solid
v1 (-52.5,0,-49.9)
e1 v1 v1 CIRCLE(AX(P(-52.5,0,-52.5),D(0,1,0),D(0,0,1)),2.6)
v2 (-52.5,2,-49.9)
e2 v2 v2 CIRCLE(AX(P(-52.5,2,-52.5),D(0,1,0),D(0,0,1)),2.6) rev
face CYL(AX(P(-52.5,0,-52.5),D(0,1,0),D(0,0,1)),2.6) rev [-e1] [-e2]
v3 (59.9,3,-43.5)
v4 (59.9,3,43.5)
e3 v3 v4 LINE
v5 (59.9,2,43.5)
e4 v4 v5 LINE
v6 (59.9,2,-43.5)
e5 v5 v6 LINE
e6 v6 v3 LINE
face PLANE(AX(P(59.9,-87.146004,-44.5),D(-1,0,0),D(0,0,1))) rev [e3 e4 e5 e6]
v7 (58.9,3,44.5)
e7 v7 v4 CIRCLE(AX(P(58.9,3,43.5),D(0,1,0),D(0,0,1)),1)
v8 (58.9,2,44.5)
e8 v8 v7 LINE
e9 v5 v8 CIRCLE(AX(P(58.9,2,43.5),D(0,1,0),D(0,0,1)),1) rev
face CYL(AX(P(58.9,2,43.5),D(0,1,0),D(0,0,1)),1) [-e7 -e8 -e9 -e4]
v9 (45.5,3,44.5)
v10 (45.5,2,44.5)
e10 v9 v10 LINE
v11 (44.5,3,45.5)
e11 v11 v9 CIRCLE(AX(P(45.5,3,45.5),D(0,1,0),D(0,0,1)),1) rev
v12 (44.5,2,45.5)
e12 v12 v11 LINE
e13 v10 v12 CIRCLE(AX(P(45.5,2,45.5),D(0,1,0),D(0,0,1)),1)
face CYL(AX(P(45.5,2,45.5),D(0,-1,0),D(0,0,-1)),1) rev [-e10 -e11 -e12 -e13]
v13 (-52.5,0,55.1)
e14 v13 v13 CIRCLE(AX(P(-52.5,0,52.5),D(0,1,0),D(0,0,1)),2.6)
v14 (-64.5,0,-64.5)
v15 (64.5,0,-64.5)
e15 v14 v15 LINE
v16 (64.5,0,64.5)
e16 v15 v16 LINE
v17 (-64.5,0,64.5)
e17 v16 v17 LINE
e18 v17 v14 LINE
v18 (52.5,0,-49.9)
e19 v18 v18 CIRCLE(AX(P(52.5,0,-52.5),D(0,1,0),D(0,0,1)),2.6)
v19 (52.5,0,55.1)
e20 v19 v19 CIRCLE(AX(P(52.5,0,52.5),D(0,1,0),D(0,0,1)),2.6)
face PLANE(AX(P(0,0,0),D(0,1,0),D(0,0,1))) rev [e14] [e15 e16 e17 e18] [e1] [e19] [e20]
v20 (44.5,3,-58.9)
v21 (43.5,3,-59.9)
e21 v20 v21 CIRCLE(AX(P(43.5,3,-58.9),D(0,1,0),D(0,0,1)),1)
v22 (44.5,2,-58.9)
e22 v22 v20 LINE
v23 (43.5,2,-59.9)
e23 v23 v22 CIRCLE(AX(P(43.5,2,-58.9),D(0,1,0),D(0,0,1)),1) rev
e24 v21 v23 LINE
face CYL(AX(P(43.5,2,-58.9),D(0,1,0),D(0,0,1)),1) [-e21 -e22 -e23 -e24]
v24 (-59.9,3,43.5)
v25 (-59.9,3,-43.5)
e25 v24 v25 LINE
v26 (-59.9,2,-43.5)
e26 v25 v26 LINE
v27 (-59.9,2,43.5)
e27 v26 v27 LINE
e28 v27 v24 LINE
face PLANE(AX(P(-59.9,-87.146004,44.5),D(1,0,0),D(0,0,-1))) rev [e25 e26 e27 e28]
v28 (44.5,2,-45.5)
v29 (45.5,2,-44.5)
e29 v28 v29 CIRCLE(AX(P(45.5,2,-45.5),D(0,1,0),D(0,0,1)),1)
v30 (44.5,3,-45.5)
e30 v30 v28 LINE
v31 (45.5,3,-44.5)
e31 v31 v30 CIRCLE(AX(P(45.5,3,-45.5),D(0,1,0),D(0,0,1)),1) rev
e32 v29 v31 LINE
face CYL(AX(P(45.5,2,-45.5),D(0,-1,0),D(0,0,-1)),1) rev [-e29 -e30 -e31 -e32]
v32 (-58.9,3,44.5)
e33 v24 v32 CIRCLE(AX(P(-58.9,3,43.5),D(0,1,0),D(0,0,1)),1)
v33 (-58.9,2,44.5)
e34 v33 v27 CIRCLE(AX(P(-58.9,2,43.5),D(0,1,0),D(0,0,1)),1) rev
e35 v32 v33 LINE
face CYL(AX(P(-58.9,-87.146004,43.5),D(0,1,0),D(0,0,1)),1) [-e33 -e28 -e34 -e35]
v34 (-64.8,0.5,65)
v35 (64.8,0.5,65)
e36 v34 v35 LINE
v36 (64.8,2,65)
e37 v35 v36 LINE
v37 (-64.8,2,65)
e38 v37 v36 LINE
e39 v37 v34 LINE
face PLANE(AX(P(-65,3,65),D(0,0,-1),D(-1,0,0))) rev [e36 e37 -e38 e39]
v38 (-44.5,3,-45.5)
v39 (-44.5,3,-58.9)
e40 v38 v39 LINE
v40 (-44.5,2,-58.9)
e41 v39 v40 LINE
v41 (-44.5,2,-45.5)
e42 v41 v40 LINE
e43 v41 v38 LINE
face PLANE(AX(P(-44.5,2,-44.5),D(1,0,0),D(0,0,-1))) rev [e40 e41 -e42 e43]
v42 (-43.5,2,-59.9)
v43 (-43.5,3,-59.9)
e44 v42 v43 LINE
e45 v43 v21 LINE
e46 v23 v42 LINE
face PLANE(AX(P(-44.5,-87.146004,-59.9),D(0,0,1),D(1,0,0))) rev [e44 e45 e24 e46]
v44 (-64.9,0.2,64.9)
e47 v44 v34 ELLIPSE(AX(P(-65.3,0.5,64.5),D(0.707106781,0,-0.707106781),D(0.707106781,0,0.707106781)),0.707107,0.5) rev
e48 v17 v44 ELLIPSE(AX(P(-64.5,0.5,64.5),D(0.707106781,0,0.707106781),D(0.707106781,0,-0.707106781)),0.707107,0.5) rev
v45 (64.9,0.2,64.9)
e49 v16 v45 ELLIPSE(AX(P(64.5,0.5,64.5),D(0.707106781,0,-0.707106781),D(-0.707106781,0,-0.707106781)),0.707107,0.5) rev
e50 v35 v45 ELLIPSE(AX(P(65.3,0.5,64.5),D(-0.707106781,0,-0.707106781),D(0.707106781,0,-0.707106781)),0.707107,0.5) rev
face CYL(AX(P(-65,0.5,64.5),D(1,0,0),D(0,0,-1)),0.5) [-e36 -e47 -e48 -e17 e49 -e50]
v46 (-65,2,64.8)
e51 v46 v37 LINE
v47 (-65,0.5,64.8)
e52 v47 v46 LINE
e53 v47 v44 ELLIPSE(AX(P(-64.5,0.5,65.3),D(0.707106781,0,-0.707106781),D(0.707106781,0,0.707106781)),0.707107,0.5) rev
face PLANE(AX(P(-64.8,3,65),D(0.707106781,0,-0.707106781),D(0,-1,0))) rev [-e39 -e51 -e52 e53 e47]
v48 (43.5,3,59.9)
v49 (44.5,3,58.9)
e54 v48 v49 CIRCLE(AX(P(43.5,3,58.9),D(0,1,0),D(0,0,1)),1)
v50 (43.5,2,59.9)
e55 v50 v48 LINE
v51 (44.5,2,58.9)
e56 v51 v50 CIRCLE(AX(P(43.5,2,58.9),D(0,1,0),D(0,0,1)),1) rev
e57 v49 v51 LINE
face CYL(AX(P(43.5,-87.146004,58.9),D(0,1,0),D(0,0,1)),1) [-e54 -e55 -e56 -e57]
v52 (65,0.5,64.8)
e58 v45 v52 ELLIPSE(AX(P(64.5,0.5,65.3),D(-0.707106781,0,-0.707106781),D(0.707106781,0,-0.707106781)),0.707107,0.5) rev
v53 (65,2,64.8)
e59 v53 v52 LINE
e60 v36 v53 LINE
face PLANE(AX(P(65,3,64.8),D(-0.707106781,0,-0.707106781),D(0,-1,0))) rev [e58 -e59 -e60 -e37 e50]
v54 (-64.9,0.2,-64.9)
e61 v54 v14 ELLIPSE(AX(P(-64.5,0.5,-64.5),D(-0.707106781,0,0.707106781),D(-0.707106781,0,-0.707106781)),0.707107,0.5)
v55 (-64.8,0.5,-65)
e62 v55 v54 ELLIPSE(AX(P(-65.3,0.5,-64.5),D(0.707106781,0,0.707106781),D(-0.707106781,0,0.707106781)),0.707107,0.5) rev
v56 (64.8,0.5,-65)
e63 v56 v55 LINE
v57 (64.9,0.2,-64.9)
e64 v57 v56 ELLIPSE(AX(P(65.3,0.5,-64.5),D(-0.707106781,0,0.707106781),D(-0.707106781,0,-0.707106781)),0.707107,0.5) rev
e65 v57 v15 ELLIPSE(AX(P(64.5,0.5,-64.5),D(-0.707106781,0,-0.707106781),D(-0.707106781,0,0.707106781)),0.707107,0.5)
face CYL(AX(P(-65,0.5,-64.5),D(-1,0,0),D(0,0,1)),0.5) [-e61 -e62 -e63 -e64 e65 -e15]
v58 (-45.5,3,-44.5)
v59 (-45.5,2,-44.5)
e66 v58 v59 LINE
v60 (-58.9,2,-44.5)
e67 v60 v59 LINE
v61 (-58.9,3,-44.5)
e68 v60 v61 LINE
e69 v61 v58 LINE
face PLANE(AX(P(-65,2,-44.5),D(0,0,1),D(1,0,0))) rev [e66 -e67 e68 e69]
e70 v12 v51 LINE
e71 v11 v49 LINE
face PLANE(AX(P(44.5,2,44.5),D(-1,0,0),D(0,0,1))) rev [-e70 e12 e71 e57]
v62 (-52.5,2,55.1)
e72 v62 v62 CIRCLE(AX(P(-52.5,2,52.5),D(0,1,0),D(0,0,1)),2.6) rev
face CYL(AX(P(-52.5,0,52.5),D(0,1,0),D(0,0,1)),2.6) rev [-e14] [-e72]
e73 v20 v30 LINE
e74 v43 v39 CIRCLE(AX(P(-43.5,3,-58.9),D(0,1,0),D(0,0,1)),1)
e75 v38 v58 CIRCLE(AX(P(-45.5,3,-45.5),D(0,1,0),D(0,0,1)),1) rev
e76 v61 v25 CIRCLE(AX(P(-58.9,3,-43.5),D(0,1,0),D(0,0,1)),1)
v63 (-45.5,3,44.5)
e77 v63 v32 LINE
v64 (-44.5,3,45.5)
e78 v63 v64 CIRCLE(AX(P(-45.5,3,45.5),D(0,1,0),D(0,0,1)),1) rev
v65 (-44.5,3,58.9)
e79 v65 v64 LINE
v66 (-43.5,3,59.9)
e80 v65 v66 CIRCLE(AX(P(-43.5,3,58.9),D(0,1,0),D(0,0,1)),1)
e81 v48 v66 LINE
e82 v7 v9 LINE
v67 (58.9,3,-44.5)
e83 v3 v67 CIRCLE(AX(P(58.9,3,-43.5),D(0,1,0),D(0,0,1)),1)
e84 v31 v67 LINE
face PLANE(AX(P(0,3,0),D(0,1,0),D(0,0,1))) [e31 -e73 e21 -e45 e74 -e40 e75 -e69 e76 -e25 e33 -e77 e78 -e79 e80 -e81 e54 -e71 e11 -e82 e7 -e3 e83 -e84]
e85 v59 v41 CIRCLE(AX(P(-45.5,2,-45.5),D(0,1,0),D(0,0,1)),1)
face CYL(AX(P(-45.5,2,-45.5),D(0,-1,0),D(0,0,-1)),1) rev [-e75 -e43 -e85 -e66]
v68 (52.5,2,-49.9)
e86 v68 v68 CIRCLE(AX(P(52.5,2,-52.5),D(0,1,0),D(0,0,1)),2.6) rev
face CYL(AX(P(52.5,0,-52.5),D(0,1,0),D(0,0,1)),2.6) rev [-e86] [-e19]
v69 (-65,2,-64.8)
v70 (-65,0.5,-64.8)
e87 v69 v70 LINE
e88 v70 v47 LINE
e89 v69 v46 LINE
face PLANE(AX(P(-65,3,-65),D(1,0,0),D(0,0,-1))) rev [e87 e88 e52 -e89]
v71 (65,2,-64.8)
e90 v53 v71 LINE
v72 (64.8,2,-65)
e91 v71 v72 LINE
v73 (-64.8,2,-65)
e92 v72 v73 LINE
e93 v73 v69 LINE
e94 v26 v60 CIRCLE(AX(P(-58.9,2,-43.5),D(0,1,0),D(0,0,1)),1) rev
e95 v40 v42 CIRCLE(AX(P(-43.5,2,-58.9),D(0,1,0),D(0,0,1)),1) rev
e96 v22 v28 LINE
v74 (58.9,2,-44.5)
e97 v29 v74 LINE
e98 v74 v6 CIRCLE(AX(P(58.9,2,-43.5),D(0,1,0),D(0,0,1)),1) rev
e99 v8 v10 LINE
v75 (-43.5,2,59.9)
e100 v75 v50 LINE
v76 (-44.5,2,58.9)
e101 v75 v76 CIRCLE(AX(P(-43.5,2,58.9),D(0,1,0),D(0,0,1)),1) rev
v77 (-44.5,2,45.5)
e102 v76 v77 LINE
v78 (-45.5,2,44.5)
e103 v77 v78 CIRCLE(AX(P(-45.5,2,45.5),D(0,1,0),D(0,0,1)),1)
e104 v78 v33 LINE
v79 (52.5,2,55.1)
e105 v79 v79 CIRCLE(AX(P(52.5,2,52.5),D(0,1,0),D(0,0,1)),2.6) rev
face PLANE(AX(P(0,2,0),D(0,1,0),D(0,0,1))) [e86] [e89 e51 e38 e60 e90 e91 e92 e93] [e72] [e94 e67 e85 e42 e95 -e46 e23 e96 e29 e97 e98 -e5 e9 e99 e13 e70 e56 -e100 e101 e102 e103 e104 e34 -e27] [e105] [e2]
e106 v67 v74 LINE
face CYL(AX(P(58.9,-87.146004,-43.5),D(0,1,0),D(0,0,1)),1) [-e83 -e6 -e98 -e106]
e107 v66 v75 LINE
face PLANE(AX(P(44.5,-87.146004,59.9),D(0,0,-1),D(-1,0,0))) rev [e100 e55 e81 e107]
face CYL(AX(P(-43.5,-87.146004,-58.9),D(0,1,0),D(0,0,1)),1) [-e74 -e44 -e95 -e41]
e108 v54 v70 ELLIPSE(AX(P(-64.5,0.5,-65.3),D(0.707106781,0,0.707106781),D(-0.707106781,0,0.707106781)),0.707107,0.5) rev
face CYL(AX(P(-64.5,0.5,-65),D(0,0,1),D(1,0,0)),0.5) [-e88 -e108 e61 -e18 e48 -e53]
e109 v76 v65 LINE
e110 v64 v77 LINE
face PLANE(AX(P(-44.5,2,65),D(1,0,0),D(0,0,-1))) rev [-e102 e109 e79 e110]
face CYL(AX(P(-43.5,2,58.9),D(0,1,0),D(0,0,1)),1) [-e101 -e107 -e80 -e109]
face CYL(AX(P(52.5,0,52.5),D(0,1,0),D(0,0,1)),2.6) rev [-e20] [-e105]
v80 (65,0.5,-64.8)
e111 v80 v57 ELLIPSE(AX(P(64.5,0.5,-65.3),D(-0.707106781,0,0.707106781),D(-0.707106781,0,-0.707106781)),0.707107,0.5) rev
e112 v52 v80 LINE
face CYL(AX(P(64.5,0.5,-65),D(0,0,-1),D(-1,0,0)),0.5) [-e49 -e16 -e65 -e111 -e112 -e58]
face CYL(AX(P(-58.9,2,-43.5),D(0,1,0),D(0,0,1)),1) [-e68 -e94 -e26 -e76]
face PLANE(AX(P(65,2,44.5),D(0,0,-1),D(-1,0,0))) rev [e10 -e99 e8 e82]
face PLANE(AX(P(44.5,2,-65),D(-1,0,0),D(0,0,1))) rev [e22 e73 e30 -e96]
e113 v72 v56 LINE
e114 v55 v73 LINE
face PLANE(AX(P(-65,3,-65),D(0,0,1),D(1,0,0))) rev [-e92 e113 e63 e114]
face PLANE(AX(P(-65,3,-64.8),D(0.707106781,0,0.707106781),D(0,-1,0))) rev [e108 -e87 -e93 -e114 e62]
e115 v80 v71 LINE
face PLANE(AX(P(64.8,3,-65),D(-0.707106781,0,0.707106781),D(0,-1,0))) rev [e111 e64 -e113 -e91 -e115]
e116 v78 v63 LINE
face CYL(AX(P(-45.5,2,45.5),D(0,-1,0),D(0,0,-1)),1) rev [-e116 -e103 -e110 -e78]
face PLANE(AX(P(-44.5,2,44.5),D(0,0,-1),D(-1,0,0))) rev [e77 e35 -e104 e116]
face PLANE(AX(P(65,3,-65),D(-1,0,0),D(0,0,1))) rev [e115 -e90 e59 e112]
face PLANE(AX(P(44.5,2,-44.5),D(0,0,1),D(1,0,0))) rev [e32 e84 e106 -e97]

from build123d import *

# Parameters (mm, degrees)
SKETCH_1_W          = 130
SKETCH_1_H          = 130
EXTRUDE_1_DEPTH     = 3
SKETCH_2_R          = 2.6
CUT_EXTRUDE_1_DEPTH = 92.972822073
SKETCH_4_W          = 20.5
SKETCH_4_H          = 20.5
CUT_EXTRUDE_2_DEPTH = 1
SKETCH_5_W          = 89
SKETCH_5_H          = 5.1
SKETCH_5_W_2        = 5.1
SKETCH_5_H_2        = 89
CUT_EXTRUDE_3_DEPTH = 1
CHAMFER_1_SIZE      = 0.2
FILLET_1_R          = 0.5
FILLET_2_R          = 1


with BuildPart() as part:
    # 草图1 → 凸台-拉伸1 (new body)
    with BuildSketch(Plane(origin=(0, 0, 0), x_dir=(1, 0, 0), z_dir=(0, 1, 0))):
        Rectangle(SKETCH_1_W, SKETCH_1_H)
    extrude(amount=EXTRUDE_1_DEPTH)

    # 草图2 → 切除-拉伸1 (cut, through all)
    with BuildSketch(Plane(origin=(0, 3, 0), x_dir=(1, 0, 0), z_dir=(0, 1, 0))):
        with Locations(Location((52.5, 52.5, 0), (0, 0, 270))):
            Circle(SKETCH_2_R)
        with Locations(Location((52.5, -52.5, 0), (0, 0, 270))):
            Circle(SKETCH_2_R)
        with Locations(Location((-52.5, -52.5, 0), (0, 0, 270))):
            Circle(SKETCH_2_R)
        with Locations(Location((-52.5, 52.5, 0), (0, 0, 270))):
            Circle(SKETCH_2_R)
    extrude(amount=-CUT_EXTRUDE_1_DEPTH, mode=Mode.SUBTRACT)

    # 草图4 → 切除-拉伸2 (cut)
    with BuildSketch(Plane(origin=(0, 3, 0), x_dir=(1, 0, 0), z_dir=(0, 1, 0))):
        with Locations((54.75, 54.75)):
            Rectangle(SKETCH_4_W, SKETCH_4_H)
        with Locations((54.75, -54.75)):
            Rectangle(SKETCH_4_W, SKETCH_4_H)
        with Locations((-54.75, -54.75)):
            Rectangle(SKETCH_4_W, SKETCH_4_H)
        with Locations((-54.75, 54.75)):
            Rectangle(SKETCH_4_W, SKETCH_4_H)
    extrude(amount=-CUT_EXTRUDE_2_DEPTH, mode=Mode.SUBTRACT)

    # 草图5 → 切除-拉伸3 (cut)
    with BuildSketch(Plane(origin=(0, 3, 0), x_dir=(1, 0, 0), z_dir=(0, 1, 0))):
        with Locations((0, 62.45)):
            Rectangle(SKETCH_5_W, SKETCH_5_H)
        with Locations((62.45, 0)):
            Rectangle(SKETCH_5_W_2, SKETCH_5_H_2)
        with Locations((0, -62.45)):
            Rectangle(SKETCH_5_W, SKETCH_5_H)
        with Locations((-62.45, 0)):
            Rectangle(SKETCH_5_W_2, SKETCH_5_H_2)
    extrude(amount=-CUT_EXTRUDE_3_DEPTH, mode=Mode.SUBTRACT)

    # 倒角1
    chamfer_1_edges = [part.edges().sort_by_distance(p)[0] for p in [
        (65, 1, 65),
        (-65, 1, 65),
        (-65, 1, -65),
        (65, 1, -65),
    ]]
    chamfer(chamfer_1_edges, length=CHAMFER_1_SIZE)

    # 圆角1
    # the kernel refuses this fillet: 0.5 mm, written as the material it takes off along each edge
    with BuildSketch(Plane(origin=(-65, 0, 66.05), x_dir=(1, 0, 0), z_dir=(0, 0, -1)), Plane(origin=(66.05, 0, 65), x_dir=(0, 0, -1), z_dir=(-1, 0, 0)), Plane(origin=(65, 0, -66.05), x_dir=(-1, 0, 0), z_dir=(0, 0, 1))) as fillet_1_piece_1:
        with BuildLine():
            CenterArc((FILLET_1_R, -FILLET_1_R), FILLET_1_R, 90, 90)
            Line((0, -FILLET_1_R), (0, 0))
            Line((0, 0), (FILLET_1_R, 0))
        make_face()
    extrude(amount=132.1, mode=Mode.SUBTRACT)
    with BuildSketch(Plane(origin=(-66.05, 0, -65), x_dir=(0, 1, 0), z_dir=(1, 0, 0))) as fillet_1_piece_2:
        with BuildLine():
            CenterArc((FILLET_1_R, FILLET_1_R), FILLET_1_R, 180, 90)
            Line((0, FILLET_1_R), (0, 0))
            Line((0, 0), (FILLET_1_R, 0))
        make_face()
    extrude(amount=132.1, mode=Mode.SUBTRACT)

    # 圆角2
    fillet_2_edges = [part.edges().sort_by_distance(p)[0] for p in [
        (-44.5, 2.5, -59.9),
        (44.5, 2.5, -59.9),
        (59.9, 2.5, -44.5),
        (59.9, 2.5, 44.5),
        (44.5, 2.5, 59.9),
        (-44.5, 2.5, 59.9),
        (-59.9, 2.5, 44.5),
        (-59.9, 2.5, -44.5),
        (-44.5, 2.5, -44.5),
        (-44.5, 2.5, 44.5),
        (44.5, 2.5, 44.5),
        (44.5, 2.5, -44.5),
    ]]
    fillet(fillet_2_edges, radius=FILLET_2_R)


solid = part.part
